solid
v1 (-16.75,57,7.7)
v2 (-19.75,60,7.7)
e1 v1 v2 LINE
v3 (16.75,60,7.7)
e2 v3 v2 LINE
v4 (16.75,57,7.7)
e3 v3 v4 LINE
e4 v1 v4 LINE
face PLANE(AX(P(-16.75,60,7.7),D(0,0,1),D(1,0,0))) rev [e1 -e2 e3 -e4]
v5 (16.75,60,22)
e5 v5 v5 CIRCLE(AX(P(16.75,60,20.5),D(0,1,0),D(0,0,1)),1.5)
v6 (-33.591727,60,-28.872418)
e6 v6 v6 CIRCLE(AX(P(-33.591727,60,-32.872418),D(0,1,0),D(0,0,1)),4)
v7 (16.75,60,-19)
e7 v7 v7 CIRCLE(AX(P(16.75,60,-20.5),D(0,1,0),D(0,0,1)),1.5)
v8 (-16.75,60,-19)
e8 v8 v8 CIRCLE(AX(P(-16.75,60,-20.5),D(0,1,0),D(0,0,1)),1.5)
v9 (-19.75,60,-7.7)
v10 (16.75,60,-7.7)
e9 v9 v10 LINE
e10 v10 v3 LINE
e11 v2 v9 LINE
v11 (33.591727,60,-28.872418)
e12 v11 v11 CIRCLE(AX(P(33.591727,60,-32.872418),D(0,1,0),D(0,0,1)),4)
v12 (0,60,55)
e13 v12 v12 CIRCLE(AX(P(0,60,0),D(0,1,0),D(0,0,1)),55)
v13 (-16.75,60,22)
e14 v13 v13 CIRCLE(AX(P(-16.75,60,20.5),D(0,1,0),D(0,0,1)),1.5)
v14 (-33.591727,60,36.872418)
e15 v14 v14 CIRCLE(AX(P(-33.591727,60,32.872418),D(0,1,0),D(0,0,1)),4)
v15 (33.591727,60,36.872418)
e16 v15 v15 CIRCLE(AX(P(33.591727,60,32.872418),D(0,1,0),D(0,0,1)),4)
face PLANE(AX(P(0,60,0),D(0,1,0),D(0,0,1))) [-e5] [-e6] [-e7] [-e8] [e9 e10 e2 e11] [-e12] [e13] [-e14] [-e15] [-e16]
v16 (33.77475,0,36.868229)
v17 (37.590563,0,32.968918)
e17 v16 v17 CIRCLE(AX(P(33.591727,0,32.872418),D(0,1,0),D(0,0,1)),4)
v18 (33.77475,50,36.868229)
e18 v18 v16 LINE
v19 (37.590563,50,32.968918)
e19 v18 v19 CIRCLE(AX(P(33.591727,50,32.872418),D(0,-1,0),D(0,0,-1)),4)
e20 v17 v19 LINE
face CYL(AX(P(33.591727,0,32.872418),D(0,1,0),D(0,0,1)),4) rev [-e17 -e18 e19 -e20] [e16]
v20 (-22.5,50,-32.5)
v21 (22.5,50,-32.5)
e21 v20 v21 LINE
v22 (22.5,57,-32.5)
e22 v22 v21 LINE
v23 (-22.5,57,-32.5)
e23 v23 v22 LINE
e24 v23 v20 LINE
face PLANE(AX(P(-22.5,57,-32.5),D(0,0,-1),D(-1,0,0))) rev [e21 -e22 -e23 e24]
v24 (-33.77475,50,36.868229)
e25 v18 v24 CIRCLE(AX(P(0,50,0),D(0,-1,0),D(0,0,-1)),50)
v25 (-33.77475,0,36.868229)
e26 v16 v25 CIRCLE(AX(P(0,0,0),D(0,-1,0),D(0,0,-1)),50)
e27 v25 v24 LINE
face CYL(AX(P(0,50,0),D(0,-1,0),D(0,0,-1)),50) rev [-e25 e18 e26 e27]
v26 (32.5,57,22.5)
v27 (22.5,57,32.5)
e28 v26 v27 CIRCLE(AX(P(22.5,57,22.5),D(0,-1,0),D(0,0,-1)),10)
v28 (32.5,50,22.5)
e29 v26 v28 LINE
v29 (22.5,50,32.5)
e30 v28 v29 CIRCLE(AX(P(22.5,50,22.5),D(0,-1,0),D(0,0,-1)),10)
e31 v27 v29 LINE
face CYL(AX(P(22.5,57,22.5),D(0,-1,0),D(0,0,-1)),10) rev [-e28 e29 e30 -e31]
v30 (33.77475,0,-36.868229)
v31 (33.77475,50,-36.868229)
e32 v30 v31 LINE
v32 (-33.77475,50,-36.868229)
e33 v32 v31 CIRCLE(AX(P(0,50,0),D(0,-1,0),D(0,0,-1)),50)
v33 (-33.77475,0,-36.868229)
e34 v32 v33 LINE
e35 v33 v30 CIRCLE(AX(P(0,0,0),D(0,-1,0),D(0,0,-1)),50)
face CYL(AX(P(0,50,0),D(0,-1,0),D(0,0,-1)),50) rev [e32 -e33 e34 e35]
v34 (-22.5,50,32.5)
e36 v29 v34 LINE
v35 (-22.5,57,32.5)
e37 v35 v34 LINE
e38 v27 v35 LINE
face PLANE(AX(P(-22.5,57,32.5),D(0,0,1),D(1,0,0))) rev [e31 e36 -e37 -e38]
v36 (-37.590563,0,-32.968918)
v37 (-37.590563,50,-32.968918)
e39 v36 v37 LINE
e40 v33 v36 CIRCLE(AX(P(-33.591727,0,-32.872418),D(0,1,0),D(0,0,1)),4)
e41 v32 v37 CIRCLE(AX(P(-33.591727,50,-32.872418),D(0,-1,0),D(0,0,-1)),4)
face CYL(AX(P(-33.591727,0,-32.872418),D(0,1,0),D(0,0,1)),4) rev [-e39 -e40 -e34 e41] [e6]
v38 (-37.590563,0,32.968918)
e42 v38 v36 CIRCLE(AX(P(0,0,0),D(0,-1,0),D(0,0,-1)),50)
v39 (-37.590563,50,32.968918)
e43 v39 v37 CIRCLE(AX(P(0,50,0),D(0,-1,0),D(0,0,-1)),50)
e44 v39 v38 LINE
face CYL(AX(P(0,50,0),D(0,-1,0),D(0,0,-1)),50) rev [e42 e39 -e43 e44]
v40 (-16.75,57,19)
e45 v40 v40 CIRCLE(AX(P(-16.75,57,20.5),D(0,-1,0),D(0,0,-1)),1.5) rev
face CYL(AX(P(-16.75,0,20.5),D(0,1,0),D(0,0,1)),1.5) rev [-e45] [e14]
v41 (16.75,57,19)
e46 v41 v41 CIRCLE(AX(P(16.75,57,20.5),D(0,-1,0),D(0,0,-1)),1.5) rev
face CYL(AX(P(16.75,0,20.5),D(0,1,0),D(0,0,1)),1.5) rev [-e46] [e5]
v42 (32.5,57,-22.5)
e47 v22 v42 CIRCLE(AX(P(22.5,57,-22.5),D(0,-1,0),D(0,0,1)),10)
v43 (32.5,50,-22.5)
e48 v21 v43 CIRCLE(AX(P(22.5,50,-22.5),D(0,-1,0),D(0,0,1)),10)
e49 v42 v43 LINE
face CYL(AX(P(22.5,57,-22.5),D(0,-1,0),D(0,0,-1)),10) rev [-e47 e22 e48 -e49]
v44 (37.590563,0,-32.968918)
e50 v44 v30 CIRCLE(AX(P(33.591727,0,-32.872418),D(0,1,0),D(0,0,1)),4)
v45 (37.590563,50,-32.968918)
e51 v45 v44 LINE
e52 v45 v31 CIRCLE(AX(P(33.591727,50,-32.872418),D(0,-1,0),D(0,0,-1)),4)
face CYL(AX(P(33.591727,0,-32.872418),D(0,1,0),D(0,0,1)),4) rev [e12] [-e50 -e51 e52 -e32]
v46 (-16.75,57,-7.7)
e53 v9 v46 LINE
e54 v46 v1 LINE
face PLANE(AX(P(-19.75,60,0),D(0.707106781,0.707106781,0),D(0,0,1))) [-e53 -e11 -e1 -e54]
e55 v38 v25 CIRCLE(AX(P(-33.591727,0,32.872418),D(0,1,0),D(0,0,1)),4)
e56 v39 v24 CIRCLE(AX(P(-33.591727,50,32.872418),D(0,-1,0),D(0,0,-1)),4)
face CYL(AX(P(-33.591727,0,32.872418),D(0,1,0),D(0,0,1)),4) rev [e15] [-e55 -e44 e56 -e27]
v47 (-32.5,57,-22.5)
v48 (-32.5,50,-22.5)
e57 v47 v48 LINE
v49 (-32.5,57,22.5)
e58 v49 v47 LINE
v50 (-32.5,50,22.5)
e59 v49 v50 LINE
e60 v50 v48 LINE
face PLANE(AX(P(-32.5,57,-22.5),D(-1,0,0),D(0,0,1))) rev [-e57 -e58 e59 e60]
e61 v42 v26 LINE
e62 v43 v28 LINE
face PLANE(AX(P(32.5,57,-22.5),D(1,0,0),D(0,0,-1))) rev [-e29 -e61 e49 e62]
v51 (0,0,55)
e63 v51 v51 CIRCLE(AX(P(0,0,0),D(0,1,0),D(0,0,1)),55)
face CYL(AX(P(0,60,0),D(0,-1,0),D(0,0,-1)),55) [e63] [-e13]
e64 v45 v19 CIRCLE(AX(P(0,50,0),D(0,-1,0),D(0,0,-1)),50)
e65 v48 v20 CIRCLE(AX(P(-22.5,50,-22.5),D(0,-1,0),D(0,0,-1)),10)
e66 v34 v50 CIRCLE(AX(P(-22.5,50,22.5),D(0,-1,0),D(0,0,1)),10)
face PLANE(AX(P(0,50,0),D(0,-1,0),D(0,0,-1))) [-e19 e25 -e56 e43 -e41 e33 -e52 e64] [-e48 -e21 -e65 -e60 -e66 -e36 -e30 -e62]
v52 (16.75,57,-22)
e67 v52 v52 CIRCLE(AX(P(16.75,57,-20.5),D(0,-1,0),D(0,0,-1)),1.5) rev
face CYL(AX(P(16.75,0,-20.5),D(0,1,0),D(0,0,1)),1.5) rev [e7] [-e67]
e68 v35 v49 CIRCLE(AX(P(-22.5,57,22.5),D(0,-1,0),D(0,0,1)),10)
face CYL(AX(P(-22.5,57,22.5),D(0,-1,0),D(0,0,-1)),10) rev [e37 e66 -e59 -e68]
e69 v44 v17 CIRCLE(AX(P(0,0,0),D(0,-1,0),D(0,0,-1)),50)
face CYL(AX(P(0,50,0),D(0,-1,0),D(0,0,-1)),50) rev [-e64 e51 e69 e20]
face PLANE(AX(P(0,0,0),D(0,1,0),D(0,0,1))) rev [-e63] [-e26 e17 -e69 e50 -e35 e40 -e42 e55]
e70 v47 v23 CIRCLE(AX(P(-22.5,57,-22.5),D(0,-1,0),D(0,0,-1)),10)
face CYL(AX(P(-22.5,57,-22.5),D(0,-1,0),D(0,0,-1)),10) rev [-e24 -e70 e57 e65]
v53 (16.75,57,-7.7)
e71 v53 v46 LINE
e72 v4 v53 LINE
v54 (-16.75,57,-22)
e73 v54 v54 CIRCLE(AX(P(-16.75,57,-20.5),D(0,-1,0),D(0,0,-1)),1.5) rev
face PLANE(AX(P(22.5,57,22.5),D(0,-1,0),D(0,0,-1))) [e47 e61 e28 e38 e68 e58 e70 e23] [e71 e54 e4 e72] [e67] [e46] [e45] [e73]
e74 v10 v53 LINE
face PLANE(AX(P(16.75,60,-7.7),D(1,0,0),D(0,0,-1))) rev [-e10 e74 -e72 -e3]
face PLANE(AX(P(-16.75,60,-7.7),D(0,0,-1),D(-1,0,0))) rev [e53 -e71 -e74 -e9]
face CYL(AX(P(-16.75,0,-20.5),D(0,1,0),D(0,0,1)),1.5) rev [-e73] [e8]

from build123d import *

# Parameters (mm, degrees)
SKETCH_1_R          = 55
EXTRUDE_1_DEPTH     = 60
SKETCH_2_R          = 50
CUT_EXTRUDE_1_DEPTH = 50
SKETCH_3_W          = 33.5
SKETCH_3_H          = 15.4
CUT_EXTRUDE_2_DEPTH = 93.466210045
SKETCH_4_R          = 1.5
SKETCH_4_R_2        = 4
CUT_EXTRUDE_3_DEPTH = 99.234413522
CUT_EXTRUDE_4_DEPTH = 7
CHAMFER_1_SIZE      = 3


with BuildPart() as part:
    # Эскиз1 → Бобышка-Вытянуть1 (new body)
    with BuildSketch(Plane(origin=(0, 0, 0), x_dir=(1, 0, 0), z_dir=(0, 1, 0))):
        with Locations(Location((0, 0, 0), (0, 0, 270))):
            Circle(SKETCH_1_R)
    extrude(amount=EXTRUDE_1_DEPTH)

    # Эскиз2 → Вырез-Вытянуть1 (cut)
    with BuildSketch(Plane.XZ):
        with Locations(Location((0, 0, 0), (0, 0, 270))):
            Circle(SKETCH_2_R)
    extrude(amount=-CUT_EXTRUDE_1_DEPTH, mode=Mode.SUBTRACT)

    # Эскиз3 → Вырез-Вытянуть2 (cut, through all)
    with BuildSketch(Plane.XZ.offset(-50)):
        Rectangle(SKETCH_3_W, SKETCH_3_H)
    extrude(amount=-CUT_EXTRUDE_2_DEPTH, mode=Mode.SUBTRACT)

    # Эскиз4 → Вырез-Вытянуть3 (cut, through all)
    with BuildSketch(Plane(origin=(0, 60, 0), x_dir=(1, 0, 0), z_dir=(0, 1, 0))):
        with Locations(Location((-16.75, 20.5, 0), (0, 0, 270))):
            Circle(SKETCH_4_R)
        with Locations(Location((16.75, 20.5, 0), (0, 0, 270))):
            Circle(SKETCH_4_R)
        with Locations(Location((-16.75, -20.5, 0), (0, 0, 270))):
            Circle(SKETCH_4_R)
        with Locations(Location((16.75, -20.5, 0), (0, 0, 270))):
            Circle(SKETCH_4_R)
        with Locations(Location((33.591727056, -32.872418125, 0), (0, 0, 270))):
            Circle(SKETCH_4_R_2)
        with Locations(Location((-33.591727056, -32.872418125, 0), (0, 0, 270))):
            Circle(SKETCH_4_R_2)
        with Locations(Location((-33.591727056, 32.872418125, 0), (0, 0, 270))):
            Circle(SKETCH_4_R_2)
        with Locations(Location((33.591727056, 32.872418125, 0), (0, 0, 270))):
            Circle(SKETCH_4_R_2)
    extrude(amount=-CUT_EXTRUDE_3_DEPTH, mode=Mode.SUBTRACT)

    # Эскиз6 → Вырез-Вытянуть4 (cut)
    with BuildSketch(Plane.XZ.offset(-50)):
        with BuildLine():
            Line((-22.5, -32.5), (22.5, -32.5))
            ThreePointArc((22.5, -32.5), (29.571067812, -29.571067812), (32.5, -22.5))
            Line((32.5, -22.5), (32.5, 22.5))
            ThreePointArc((32.5, 22.5), (29.571067812, 29.571067812), (22.5, 32.5))
            Line((22.5, 32.5), (-22.5, 32.5))
            ThreePointArc((-22.5, 32.5), (-29.571067812, 29.571067812), (-32.5, 22.5))
            Line((-32.5, 22.5), (-32.5, -22.5))
            ThreePointArc((-32.5, -22.5), (-29.571067812, -29.571067812), (-22.5, -32.5))
        make_face()
    extrude(amount=-CUT_EXTRUDE_4_DEPTH, mode=Mode.SUBTRACT)

    # Фаска1
    chamfer_1_edges = [part.edges().sort_by_distance(p)[0] for p in [
        (-16.75, 60, 0),
    ]]
    chamfer(chamfer_1_edges, length=CHAMFER_1_SIZE - 0.0001)  # a hair under: the kernel refuses the full size


solid = part.part
